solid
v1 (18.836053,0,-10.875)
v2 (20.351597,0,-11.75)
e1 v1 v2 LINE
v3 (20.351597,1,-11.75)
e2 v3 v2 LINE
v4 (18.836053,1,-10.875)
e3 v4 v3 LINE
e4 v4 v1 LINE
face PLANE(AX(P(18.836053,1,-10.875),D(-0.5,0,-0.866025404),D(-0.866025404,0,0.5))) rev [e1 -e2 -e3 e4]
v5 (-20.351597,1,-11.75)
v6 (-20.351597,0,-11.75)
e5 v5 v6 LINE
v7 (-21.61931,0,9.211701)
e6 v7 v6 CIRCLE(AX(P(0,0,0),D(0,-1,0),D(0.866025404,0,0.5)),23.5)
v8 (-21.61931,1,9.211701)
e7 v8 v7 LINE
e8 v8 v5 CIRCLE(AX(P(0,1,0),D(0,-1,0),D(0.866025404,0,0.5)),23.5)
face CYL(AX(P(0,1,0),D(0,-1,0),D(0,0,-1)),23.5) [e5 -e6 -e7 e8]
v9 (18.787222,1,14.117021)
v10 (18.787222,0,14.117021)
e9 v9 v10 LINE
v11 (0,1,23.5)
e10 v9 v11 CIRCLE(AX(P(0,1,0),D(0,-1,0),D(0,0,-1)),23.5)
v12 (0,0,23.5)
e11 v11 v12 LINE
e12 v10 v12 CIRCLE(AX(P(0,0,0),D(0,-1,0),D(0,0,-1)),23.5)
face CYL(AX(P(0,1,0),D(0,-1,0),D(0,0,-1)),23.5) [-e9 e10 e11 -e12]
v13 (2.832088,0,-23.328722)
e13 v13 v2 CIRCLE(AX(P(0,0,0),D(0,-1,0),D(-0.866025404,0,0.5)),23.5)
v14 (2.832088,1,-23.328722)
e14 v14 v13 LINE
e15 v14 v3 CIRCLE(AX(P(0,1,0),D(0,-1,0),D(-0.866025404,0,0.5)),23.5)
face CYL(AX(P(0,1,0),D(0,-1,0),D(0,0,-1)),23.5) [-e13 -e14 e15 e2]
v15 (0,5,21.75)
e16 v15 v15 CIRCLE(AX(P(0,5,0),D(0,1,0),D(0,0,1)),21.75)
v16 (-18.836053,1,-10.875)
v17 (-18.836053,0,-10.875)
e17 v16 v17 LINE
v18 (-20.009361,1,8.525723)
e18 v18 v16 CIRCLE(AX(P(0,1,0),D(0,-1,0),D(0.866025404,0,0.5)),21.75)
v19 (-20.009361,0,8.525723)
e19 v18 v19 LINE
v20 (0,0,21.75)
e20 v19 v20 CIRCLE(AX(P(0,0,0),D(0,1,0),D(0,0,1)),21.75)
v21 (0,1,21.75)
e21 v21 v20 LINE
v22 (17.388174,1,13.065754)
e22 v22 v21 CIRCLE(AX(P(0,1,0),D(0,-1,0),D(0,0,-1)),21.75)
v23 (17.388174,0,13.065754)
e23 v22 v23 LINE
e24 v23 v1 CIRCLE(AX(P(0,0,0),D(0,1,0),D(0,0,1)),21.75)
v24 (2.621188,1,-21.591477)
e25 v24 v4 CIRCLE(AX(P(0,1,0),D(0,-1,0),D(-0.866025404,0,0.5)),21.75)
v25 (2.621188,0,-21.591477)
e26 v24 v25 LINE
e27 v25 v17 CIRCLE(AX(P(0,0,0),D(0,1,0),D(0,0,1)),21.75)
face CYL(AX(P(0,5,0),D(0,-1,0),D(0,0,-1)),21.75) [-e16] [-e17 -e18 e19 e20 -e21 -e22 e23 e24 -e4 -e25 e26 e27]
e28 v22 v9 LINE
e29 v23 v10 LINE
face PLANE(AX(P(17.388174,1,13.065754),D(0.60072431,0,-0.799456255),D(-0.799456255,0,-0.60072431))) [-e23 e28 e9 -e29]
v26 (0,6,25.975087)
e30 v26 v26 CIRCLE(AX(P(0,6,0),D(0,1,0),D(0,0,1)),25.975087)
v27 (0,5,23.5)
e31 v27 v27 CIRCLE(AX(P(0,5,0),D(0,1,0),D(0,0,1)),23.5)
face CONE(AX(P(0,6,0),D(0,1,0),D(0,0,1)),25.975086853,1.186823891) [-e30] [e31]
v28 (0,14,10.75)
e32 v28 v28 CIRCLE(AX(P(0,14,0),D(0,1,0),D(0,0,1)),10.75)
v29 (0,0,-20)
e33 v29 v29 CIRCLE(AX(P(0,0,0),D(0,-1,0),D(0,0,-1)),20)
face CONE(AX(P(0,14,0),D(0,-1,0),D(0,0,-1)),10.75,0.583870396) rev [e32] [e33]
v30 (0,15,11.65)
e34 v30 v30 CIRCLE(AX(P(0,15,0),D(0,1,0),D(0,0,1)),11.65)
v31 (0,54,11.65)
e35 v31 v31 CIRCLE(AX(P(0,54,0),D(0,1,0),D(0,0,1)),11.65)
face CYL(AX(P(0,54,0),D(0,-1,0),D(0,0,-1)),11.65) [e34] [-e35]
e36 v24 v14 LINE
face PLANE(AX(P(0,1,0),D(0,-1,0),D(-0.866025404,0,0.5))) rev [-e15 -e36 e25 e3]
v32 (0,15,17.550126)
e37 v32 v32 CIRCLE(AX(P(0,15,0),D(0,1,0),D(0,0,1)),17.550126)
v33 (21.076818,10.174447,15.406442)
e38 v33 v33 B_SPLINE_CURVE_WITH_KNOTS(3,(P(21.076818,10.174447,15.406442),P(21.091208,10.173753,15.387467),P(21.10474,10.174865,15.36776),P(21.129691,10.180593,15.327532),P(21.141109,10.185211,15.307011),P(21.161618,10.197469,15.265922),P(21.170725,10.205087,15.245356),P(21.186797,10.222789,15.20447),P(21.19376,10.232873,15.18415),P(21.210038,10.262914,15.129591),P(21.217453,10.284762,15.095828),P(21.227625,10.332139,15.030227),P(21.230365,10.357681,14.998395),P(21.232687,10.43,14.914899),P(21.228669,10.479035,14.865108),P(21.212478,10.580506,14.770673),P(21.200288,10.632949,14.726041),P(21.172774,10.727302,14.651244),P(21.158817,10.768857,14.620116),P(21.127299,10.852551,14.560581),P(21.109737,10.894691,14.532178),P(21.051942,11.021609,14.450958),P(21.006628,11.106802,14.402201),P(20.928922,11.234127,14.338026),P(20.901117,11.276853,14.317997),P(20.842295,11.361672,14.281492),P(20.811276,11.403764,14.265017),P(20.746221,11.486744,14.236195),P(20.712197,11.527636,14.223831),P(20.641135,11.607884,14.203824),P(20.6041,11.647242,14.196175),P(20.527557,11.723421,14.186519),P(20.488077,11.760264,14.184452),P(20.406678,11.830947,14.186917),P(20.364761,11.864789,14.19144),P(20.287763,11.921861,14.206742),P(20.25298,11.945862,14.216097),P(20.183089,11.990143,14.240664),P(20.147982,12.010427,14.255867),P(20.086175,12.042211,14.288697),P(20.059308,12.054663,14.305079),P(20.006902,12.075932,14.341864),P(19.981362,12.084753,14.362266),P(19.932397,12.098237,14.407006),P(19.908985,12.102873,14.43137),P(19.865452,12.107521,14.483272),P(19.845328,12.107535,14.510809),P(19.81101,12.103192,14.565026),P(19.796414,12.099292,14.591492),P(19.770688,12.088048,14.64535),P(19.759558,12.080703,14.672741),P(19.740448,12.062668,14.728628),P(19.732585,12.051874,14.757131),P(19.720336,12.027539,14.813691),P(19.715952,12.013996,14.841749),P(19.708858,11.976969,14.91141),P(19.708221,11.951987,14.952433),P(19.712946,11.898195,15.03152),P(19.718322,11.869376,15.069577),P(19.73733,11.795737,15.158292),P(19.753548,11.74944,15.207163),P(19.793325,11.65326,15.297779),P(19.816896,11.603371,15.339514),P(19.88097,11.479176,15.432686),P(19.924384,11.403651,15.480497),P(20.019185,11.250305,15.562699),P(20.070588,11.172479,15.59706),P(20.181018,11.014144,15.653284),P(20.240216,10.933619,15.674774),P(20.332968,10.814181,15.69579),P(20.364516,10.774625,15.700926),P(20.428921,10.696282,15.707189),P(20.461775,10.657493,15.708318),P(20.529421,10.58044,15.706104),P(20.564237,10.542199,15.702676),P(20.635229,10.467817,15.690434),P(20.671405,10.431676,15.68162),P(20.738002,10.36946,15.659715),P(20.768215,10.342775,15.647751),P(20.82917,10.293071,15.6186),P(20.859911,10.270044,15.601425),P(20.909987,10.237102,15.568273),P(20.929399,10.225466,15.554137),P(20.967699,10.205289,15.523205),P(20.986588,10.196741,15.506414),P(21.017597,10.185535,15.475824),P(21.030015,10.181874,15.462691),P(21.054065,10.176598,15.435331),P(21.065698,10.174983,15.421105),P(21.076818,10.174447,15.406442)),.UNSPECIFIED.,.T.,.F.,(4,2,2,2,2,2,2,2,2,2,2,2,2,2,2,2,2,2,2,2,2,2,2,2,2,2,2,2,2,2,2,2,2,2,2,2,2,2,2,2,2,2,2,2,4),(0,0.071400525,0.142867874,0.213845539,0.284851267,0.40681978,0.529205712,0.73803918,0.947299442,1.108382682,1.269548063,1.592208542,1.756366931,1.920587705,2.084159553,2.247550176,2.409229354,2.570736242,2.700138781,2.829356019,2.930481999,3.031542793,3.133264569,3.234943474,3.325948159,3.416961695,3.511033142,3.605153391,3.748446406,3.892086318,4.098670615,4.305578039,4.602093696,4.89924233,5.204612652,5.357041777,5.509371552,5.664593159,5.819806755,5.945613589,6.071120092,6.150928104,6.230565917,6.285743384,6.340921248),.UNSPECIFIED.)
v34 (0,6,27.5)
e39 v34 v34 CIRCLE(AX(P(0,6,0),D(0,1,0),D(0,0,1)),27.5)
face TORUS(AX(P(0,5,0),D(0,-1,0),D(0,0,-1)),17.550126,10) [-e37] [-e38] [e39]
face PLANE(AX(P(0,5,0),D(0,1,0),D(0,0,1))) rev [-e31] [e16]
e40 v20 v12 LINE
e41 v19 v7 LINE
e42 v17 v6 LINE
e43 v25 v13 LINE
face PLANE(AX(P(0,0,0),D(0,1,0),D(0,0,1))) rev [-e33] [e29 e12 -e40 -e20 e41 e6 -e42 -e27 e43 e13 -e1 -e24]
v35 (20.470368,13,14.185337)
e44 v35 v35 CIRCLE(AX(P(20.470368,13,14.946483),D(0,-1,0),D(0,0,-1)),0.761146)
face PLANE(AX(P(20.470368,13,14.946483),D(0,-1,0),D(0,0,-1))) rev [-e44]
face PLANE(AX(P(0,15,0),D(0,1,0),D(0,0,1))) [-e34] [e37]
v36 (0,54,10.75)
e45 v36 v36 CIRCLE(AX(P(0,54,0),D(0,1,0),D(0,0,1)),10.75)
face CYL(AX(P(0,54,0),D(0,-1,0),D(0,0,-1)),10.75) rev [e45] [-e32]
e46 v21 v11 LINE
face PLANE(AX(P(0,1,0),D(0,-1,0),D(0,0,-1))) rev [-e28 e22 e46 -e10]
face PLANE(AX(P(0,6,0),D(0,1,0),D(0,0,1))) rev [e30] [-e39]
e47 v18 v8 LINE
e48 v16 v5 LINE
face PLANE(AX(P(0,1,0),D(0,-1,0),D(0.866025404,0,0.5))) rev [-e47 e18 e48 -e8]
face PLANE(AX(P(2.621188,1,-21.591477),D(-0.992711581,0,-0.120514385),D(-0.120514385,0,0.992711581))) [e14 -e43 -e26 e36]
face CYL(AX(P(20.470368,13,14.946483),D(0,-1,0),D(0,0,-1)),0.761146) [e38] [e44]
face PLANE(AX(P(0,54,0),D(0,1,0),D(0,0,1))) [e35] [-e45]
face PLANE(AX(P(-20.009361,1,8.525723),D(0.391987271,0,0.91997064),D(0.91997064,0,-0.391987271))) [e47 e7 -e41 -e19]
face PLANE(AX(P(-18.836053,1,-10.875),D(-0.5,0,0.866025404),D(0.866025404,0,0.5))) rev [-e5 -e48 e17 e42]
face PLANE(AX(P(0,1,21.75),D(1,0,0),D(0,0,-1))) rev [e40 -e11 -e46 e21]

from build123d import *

# Parameters (mm, degrees)
SKETCH1_R           = 21.75
SKETCH1_R_2         = 20
BOSS_EXTRUDE1_DEPTH = 5
SKETCH2_R           = 23.5
SKETCH2_R_2         = 20
BOSS_EXTRUDE2_DEPTH = 1
SKETCH3_R           = 27.5
SKETCH3_R_2         = 20
BOSS_EXTRUDE3_DEPTH = 8
SKETCH4_R           = 11.65
SKETCH4_R_2         = 10.75
BOSS_EXTRUDE4_DEPTH = 40
SKETCH5_R           = 27.5
SKETCH5_R_2         = 11.65
BOSS_EXTRUDE5_DEPTH = 1
BOSS_EXTRUDE6_DEPTH = 1
CIRPATTERN1_COUNT   = 3
FILLET1_R           = 10
SKETCH8_R           = 0.761145908
BOSS_EXTRUDE7_DEPTH = 7
CHAMFER2_SIZE2      = 1
CHAMFER2_SIZE       = 2.475086853


# Some blends are built 0.0001 mm under size
with BuildPart() as part:
    # Sketch1 → Boss-Extrude1 (new body)
    with BuildSketch(Plane(origin=(0, 0, 0), x_dir=(1, 0, 0), z_dir=(0, 1, 0))):
        with Locations(Location((0, 0, 0), (0, 0, 270))):
            Circle(SKETCH1_R)
        with Locations(Location((0, 0, 0), (0, 0, 270))):
            Circle(SKETCH1_R_2, mode=Mode.SUBTRACT)
    boss_extrude1 = extrude(amount=BOSS_EXTRUDE1_DEPTH)

    # Sketch2 → Boss-Extrude2 (add)
    with BuildSketch(Plane(origin=(0, 5, 0), x_dir=(1, 0, 0), z_dir=(0, 1, 0))):
        with Locations(Location((0, 0, 0), (0, 0, 270))):
            Circle(SKETCH2_R)
        with Locations(Location((0, 0, 0), (0, 0, 270))):
            Circle(SKETCH2_R_2, mode=Mode.SUBTRACT)
    extrude(amount=BOSS_EXTRUDE2_DEPTH)

    # Sketch3 → Boss-Extrude3 (add)
    with BuildSketch(Plane(origin=(0, 6, 0), x_dir=(1, 0, 0), z_dir=(0, 1, 0))):
        with Locations(Location((0, 0, 0), (0, 0, 270))):
            Circle(SKETCH3_R)
        with Locations(Location((0, 0, 0), (0, 0, 270))):
            Circle(SKETCH3_R_2, mode=Mode.SUBTRACT)
    extrude(amount=BOSS_EXTRUDE3_DEPTH)



with BuildPart() as body_2:
    # Sketch4 → Boss-Extrude4 (new body)
    with BuildSketch(Plane(origin=(0, 14, 0), x_dir=(1, 0, 0), z_dir=(0, 1, 0))):
        with Locations(Location((0, 0, 0), (0, 0, 270))):
            Circle(SKETCH4_R)
        with Locations(Location((0, 0, 0), (0, 0, 270))):
            Circle(SKETCH4_R_2, mode=Mode.SUBTRACT)
    extrude(amount=BOSS_EXTRUDE4_DEPTH)


with BuildPart() as part_1:
    add(part.part)

    add(body_2.part)  # Boss-Extrude5 merges body 2
    # Sketch5 → Boss-Extrude5 (add)
    with BuildSketch(Plane(origin=(0, 14, 0), x_dir=(1, 0, 0), z_dir=(0, 1, 0))):
        with Locations(Location((0, 0, 0), (0, 0, 270))):
            Circle(SKETCH5_R)
        with Locations(Location((0, 0, 0), (0, 0, 270))):
            Circle(SKETCH5_R_2, mode=Mode.SUBTRACT)
    extrude(amount=BOSS_EXTRUDE5_DEPTH)

    # Sketch6 → Revolve1 (revolve)
    with BuildSketch(Plane.XY, mode=Mode.PRIVATE) as revolve1_sk:
        Polygon((10.75, 14), (20, 0), (20, 14), align=None)
    revolve(revolve1_sk.sketch.rotate(Axis((0, 0, 0), (0, 1, 0)), 90), axis=Axis((0, 0, 0), (0, 1, 0)))

    # Sketch7 → Boss-Extrude6 (add)
    with BuildSketch(Plane.XZ):
        with BuildLine():
            Line((0, 21.75), (0, 23.5))
            ThreePointArc((0, 23.5), (10.5, 21.023796042), (18.787221995, 14.117021277))
            Line((18.787221995, 14.117021277), (17.388173548, 13.065753735))
            ThreePointArc((17.388173548, 13.065753735), (9.718085106, 19.458194209), (0, 21.75))
        make_face()
    boss_extrude6 = extrude(amount=-BOSS_EXTRUDE6_DEPTH)

    # CirPattern1: Boss-Extrude1, Boss-Extrude6 ×3 about axis
    cirpattern1_axis = Axis((0, 0, 0), (0, 1, 0))
    add([boss_extrude1.rotate(cirpattern1_axis, i * 360 / CIRPATTERN1_COUNT) for i in range(1, CIRPATTERN1_COUNT)])
    add([boss_extrude6.rotate(cirpattern1_axis, i * 360 / CIRPATTERN1_COUNT) for i in range(1, CIRPATTERN1_COUNT)])

    # Fillet1
    # the kernel refuses this fillet: 10 mm, written as the material it takes off along each edge
    with BuildSketch(Plane(origin=(0, 15, 0), x_dir=(0, 0, 1), z_dir=(-1, 0, 0))) as fillet1_piece_1:
        with BuildLine():
            CenterArc((17.550125629, -10), FILLET1_R, 5.739170477, 84.260829523)
            Line((17.550125629, 0), (17.550125629, 0.2))
            Line((17.550125629, 0.2), (27.5, 0.2))
            Line((27.5, 0.2), (27.7, 0))
            ThreePointArc((27.7, 0), (27.7, -4.5), (27.698997487, -8.98))
            Line((27.698997487, -8.98), (27.5, -9))
        make_face()
    revolve(axis=Axis((0, 15, 0), (0, 1, 0)), mode=Mode.SUBTRACT)

    # Sketch8 → Boss-Extrude7 (add)
    with BuildSketch(Plane.XZ.offset(-6)):
        with Locations(Location((20.470368468, 14.946483104, 0), (0, 0, 270))):
            Circle(SKETCH8_R)
    extrude(amount=-BOSS_EXTRUDE7_DEPTH)

    # Chamfer2
    chamfer2_edges = [part_1.edges().sort_by_distance(p)[0] for p in [
        (0, 6, -23.5),
    ]]
    chamfer2_side = [part_1.faces().sort_by_distance(p)[0] for p in [
        (0, 6, -23.52),
    ]]
    chamfer(chamfer2_edges, length=CHAMFER2_SIZE - 0.0001, length2=CHAMFER2_SIZE2 - 0.0001, reference=chamfer2_side[0])  # a hair under: the kernel refuses the full size


solid = part_1.part
